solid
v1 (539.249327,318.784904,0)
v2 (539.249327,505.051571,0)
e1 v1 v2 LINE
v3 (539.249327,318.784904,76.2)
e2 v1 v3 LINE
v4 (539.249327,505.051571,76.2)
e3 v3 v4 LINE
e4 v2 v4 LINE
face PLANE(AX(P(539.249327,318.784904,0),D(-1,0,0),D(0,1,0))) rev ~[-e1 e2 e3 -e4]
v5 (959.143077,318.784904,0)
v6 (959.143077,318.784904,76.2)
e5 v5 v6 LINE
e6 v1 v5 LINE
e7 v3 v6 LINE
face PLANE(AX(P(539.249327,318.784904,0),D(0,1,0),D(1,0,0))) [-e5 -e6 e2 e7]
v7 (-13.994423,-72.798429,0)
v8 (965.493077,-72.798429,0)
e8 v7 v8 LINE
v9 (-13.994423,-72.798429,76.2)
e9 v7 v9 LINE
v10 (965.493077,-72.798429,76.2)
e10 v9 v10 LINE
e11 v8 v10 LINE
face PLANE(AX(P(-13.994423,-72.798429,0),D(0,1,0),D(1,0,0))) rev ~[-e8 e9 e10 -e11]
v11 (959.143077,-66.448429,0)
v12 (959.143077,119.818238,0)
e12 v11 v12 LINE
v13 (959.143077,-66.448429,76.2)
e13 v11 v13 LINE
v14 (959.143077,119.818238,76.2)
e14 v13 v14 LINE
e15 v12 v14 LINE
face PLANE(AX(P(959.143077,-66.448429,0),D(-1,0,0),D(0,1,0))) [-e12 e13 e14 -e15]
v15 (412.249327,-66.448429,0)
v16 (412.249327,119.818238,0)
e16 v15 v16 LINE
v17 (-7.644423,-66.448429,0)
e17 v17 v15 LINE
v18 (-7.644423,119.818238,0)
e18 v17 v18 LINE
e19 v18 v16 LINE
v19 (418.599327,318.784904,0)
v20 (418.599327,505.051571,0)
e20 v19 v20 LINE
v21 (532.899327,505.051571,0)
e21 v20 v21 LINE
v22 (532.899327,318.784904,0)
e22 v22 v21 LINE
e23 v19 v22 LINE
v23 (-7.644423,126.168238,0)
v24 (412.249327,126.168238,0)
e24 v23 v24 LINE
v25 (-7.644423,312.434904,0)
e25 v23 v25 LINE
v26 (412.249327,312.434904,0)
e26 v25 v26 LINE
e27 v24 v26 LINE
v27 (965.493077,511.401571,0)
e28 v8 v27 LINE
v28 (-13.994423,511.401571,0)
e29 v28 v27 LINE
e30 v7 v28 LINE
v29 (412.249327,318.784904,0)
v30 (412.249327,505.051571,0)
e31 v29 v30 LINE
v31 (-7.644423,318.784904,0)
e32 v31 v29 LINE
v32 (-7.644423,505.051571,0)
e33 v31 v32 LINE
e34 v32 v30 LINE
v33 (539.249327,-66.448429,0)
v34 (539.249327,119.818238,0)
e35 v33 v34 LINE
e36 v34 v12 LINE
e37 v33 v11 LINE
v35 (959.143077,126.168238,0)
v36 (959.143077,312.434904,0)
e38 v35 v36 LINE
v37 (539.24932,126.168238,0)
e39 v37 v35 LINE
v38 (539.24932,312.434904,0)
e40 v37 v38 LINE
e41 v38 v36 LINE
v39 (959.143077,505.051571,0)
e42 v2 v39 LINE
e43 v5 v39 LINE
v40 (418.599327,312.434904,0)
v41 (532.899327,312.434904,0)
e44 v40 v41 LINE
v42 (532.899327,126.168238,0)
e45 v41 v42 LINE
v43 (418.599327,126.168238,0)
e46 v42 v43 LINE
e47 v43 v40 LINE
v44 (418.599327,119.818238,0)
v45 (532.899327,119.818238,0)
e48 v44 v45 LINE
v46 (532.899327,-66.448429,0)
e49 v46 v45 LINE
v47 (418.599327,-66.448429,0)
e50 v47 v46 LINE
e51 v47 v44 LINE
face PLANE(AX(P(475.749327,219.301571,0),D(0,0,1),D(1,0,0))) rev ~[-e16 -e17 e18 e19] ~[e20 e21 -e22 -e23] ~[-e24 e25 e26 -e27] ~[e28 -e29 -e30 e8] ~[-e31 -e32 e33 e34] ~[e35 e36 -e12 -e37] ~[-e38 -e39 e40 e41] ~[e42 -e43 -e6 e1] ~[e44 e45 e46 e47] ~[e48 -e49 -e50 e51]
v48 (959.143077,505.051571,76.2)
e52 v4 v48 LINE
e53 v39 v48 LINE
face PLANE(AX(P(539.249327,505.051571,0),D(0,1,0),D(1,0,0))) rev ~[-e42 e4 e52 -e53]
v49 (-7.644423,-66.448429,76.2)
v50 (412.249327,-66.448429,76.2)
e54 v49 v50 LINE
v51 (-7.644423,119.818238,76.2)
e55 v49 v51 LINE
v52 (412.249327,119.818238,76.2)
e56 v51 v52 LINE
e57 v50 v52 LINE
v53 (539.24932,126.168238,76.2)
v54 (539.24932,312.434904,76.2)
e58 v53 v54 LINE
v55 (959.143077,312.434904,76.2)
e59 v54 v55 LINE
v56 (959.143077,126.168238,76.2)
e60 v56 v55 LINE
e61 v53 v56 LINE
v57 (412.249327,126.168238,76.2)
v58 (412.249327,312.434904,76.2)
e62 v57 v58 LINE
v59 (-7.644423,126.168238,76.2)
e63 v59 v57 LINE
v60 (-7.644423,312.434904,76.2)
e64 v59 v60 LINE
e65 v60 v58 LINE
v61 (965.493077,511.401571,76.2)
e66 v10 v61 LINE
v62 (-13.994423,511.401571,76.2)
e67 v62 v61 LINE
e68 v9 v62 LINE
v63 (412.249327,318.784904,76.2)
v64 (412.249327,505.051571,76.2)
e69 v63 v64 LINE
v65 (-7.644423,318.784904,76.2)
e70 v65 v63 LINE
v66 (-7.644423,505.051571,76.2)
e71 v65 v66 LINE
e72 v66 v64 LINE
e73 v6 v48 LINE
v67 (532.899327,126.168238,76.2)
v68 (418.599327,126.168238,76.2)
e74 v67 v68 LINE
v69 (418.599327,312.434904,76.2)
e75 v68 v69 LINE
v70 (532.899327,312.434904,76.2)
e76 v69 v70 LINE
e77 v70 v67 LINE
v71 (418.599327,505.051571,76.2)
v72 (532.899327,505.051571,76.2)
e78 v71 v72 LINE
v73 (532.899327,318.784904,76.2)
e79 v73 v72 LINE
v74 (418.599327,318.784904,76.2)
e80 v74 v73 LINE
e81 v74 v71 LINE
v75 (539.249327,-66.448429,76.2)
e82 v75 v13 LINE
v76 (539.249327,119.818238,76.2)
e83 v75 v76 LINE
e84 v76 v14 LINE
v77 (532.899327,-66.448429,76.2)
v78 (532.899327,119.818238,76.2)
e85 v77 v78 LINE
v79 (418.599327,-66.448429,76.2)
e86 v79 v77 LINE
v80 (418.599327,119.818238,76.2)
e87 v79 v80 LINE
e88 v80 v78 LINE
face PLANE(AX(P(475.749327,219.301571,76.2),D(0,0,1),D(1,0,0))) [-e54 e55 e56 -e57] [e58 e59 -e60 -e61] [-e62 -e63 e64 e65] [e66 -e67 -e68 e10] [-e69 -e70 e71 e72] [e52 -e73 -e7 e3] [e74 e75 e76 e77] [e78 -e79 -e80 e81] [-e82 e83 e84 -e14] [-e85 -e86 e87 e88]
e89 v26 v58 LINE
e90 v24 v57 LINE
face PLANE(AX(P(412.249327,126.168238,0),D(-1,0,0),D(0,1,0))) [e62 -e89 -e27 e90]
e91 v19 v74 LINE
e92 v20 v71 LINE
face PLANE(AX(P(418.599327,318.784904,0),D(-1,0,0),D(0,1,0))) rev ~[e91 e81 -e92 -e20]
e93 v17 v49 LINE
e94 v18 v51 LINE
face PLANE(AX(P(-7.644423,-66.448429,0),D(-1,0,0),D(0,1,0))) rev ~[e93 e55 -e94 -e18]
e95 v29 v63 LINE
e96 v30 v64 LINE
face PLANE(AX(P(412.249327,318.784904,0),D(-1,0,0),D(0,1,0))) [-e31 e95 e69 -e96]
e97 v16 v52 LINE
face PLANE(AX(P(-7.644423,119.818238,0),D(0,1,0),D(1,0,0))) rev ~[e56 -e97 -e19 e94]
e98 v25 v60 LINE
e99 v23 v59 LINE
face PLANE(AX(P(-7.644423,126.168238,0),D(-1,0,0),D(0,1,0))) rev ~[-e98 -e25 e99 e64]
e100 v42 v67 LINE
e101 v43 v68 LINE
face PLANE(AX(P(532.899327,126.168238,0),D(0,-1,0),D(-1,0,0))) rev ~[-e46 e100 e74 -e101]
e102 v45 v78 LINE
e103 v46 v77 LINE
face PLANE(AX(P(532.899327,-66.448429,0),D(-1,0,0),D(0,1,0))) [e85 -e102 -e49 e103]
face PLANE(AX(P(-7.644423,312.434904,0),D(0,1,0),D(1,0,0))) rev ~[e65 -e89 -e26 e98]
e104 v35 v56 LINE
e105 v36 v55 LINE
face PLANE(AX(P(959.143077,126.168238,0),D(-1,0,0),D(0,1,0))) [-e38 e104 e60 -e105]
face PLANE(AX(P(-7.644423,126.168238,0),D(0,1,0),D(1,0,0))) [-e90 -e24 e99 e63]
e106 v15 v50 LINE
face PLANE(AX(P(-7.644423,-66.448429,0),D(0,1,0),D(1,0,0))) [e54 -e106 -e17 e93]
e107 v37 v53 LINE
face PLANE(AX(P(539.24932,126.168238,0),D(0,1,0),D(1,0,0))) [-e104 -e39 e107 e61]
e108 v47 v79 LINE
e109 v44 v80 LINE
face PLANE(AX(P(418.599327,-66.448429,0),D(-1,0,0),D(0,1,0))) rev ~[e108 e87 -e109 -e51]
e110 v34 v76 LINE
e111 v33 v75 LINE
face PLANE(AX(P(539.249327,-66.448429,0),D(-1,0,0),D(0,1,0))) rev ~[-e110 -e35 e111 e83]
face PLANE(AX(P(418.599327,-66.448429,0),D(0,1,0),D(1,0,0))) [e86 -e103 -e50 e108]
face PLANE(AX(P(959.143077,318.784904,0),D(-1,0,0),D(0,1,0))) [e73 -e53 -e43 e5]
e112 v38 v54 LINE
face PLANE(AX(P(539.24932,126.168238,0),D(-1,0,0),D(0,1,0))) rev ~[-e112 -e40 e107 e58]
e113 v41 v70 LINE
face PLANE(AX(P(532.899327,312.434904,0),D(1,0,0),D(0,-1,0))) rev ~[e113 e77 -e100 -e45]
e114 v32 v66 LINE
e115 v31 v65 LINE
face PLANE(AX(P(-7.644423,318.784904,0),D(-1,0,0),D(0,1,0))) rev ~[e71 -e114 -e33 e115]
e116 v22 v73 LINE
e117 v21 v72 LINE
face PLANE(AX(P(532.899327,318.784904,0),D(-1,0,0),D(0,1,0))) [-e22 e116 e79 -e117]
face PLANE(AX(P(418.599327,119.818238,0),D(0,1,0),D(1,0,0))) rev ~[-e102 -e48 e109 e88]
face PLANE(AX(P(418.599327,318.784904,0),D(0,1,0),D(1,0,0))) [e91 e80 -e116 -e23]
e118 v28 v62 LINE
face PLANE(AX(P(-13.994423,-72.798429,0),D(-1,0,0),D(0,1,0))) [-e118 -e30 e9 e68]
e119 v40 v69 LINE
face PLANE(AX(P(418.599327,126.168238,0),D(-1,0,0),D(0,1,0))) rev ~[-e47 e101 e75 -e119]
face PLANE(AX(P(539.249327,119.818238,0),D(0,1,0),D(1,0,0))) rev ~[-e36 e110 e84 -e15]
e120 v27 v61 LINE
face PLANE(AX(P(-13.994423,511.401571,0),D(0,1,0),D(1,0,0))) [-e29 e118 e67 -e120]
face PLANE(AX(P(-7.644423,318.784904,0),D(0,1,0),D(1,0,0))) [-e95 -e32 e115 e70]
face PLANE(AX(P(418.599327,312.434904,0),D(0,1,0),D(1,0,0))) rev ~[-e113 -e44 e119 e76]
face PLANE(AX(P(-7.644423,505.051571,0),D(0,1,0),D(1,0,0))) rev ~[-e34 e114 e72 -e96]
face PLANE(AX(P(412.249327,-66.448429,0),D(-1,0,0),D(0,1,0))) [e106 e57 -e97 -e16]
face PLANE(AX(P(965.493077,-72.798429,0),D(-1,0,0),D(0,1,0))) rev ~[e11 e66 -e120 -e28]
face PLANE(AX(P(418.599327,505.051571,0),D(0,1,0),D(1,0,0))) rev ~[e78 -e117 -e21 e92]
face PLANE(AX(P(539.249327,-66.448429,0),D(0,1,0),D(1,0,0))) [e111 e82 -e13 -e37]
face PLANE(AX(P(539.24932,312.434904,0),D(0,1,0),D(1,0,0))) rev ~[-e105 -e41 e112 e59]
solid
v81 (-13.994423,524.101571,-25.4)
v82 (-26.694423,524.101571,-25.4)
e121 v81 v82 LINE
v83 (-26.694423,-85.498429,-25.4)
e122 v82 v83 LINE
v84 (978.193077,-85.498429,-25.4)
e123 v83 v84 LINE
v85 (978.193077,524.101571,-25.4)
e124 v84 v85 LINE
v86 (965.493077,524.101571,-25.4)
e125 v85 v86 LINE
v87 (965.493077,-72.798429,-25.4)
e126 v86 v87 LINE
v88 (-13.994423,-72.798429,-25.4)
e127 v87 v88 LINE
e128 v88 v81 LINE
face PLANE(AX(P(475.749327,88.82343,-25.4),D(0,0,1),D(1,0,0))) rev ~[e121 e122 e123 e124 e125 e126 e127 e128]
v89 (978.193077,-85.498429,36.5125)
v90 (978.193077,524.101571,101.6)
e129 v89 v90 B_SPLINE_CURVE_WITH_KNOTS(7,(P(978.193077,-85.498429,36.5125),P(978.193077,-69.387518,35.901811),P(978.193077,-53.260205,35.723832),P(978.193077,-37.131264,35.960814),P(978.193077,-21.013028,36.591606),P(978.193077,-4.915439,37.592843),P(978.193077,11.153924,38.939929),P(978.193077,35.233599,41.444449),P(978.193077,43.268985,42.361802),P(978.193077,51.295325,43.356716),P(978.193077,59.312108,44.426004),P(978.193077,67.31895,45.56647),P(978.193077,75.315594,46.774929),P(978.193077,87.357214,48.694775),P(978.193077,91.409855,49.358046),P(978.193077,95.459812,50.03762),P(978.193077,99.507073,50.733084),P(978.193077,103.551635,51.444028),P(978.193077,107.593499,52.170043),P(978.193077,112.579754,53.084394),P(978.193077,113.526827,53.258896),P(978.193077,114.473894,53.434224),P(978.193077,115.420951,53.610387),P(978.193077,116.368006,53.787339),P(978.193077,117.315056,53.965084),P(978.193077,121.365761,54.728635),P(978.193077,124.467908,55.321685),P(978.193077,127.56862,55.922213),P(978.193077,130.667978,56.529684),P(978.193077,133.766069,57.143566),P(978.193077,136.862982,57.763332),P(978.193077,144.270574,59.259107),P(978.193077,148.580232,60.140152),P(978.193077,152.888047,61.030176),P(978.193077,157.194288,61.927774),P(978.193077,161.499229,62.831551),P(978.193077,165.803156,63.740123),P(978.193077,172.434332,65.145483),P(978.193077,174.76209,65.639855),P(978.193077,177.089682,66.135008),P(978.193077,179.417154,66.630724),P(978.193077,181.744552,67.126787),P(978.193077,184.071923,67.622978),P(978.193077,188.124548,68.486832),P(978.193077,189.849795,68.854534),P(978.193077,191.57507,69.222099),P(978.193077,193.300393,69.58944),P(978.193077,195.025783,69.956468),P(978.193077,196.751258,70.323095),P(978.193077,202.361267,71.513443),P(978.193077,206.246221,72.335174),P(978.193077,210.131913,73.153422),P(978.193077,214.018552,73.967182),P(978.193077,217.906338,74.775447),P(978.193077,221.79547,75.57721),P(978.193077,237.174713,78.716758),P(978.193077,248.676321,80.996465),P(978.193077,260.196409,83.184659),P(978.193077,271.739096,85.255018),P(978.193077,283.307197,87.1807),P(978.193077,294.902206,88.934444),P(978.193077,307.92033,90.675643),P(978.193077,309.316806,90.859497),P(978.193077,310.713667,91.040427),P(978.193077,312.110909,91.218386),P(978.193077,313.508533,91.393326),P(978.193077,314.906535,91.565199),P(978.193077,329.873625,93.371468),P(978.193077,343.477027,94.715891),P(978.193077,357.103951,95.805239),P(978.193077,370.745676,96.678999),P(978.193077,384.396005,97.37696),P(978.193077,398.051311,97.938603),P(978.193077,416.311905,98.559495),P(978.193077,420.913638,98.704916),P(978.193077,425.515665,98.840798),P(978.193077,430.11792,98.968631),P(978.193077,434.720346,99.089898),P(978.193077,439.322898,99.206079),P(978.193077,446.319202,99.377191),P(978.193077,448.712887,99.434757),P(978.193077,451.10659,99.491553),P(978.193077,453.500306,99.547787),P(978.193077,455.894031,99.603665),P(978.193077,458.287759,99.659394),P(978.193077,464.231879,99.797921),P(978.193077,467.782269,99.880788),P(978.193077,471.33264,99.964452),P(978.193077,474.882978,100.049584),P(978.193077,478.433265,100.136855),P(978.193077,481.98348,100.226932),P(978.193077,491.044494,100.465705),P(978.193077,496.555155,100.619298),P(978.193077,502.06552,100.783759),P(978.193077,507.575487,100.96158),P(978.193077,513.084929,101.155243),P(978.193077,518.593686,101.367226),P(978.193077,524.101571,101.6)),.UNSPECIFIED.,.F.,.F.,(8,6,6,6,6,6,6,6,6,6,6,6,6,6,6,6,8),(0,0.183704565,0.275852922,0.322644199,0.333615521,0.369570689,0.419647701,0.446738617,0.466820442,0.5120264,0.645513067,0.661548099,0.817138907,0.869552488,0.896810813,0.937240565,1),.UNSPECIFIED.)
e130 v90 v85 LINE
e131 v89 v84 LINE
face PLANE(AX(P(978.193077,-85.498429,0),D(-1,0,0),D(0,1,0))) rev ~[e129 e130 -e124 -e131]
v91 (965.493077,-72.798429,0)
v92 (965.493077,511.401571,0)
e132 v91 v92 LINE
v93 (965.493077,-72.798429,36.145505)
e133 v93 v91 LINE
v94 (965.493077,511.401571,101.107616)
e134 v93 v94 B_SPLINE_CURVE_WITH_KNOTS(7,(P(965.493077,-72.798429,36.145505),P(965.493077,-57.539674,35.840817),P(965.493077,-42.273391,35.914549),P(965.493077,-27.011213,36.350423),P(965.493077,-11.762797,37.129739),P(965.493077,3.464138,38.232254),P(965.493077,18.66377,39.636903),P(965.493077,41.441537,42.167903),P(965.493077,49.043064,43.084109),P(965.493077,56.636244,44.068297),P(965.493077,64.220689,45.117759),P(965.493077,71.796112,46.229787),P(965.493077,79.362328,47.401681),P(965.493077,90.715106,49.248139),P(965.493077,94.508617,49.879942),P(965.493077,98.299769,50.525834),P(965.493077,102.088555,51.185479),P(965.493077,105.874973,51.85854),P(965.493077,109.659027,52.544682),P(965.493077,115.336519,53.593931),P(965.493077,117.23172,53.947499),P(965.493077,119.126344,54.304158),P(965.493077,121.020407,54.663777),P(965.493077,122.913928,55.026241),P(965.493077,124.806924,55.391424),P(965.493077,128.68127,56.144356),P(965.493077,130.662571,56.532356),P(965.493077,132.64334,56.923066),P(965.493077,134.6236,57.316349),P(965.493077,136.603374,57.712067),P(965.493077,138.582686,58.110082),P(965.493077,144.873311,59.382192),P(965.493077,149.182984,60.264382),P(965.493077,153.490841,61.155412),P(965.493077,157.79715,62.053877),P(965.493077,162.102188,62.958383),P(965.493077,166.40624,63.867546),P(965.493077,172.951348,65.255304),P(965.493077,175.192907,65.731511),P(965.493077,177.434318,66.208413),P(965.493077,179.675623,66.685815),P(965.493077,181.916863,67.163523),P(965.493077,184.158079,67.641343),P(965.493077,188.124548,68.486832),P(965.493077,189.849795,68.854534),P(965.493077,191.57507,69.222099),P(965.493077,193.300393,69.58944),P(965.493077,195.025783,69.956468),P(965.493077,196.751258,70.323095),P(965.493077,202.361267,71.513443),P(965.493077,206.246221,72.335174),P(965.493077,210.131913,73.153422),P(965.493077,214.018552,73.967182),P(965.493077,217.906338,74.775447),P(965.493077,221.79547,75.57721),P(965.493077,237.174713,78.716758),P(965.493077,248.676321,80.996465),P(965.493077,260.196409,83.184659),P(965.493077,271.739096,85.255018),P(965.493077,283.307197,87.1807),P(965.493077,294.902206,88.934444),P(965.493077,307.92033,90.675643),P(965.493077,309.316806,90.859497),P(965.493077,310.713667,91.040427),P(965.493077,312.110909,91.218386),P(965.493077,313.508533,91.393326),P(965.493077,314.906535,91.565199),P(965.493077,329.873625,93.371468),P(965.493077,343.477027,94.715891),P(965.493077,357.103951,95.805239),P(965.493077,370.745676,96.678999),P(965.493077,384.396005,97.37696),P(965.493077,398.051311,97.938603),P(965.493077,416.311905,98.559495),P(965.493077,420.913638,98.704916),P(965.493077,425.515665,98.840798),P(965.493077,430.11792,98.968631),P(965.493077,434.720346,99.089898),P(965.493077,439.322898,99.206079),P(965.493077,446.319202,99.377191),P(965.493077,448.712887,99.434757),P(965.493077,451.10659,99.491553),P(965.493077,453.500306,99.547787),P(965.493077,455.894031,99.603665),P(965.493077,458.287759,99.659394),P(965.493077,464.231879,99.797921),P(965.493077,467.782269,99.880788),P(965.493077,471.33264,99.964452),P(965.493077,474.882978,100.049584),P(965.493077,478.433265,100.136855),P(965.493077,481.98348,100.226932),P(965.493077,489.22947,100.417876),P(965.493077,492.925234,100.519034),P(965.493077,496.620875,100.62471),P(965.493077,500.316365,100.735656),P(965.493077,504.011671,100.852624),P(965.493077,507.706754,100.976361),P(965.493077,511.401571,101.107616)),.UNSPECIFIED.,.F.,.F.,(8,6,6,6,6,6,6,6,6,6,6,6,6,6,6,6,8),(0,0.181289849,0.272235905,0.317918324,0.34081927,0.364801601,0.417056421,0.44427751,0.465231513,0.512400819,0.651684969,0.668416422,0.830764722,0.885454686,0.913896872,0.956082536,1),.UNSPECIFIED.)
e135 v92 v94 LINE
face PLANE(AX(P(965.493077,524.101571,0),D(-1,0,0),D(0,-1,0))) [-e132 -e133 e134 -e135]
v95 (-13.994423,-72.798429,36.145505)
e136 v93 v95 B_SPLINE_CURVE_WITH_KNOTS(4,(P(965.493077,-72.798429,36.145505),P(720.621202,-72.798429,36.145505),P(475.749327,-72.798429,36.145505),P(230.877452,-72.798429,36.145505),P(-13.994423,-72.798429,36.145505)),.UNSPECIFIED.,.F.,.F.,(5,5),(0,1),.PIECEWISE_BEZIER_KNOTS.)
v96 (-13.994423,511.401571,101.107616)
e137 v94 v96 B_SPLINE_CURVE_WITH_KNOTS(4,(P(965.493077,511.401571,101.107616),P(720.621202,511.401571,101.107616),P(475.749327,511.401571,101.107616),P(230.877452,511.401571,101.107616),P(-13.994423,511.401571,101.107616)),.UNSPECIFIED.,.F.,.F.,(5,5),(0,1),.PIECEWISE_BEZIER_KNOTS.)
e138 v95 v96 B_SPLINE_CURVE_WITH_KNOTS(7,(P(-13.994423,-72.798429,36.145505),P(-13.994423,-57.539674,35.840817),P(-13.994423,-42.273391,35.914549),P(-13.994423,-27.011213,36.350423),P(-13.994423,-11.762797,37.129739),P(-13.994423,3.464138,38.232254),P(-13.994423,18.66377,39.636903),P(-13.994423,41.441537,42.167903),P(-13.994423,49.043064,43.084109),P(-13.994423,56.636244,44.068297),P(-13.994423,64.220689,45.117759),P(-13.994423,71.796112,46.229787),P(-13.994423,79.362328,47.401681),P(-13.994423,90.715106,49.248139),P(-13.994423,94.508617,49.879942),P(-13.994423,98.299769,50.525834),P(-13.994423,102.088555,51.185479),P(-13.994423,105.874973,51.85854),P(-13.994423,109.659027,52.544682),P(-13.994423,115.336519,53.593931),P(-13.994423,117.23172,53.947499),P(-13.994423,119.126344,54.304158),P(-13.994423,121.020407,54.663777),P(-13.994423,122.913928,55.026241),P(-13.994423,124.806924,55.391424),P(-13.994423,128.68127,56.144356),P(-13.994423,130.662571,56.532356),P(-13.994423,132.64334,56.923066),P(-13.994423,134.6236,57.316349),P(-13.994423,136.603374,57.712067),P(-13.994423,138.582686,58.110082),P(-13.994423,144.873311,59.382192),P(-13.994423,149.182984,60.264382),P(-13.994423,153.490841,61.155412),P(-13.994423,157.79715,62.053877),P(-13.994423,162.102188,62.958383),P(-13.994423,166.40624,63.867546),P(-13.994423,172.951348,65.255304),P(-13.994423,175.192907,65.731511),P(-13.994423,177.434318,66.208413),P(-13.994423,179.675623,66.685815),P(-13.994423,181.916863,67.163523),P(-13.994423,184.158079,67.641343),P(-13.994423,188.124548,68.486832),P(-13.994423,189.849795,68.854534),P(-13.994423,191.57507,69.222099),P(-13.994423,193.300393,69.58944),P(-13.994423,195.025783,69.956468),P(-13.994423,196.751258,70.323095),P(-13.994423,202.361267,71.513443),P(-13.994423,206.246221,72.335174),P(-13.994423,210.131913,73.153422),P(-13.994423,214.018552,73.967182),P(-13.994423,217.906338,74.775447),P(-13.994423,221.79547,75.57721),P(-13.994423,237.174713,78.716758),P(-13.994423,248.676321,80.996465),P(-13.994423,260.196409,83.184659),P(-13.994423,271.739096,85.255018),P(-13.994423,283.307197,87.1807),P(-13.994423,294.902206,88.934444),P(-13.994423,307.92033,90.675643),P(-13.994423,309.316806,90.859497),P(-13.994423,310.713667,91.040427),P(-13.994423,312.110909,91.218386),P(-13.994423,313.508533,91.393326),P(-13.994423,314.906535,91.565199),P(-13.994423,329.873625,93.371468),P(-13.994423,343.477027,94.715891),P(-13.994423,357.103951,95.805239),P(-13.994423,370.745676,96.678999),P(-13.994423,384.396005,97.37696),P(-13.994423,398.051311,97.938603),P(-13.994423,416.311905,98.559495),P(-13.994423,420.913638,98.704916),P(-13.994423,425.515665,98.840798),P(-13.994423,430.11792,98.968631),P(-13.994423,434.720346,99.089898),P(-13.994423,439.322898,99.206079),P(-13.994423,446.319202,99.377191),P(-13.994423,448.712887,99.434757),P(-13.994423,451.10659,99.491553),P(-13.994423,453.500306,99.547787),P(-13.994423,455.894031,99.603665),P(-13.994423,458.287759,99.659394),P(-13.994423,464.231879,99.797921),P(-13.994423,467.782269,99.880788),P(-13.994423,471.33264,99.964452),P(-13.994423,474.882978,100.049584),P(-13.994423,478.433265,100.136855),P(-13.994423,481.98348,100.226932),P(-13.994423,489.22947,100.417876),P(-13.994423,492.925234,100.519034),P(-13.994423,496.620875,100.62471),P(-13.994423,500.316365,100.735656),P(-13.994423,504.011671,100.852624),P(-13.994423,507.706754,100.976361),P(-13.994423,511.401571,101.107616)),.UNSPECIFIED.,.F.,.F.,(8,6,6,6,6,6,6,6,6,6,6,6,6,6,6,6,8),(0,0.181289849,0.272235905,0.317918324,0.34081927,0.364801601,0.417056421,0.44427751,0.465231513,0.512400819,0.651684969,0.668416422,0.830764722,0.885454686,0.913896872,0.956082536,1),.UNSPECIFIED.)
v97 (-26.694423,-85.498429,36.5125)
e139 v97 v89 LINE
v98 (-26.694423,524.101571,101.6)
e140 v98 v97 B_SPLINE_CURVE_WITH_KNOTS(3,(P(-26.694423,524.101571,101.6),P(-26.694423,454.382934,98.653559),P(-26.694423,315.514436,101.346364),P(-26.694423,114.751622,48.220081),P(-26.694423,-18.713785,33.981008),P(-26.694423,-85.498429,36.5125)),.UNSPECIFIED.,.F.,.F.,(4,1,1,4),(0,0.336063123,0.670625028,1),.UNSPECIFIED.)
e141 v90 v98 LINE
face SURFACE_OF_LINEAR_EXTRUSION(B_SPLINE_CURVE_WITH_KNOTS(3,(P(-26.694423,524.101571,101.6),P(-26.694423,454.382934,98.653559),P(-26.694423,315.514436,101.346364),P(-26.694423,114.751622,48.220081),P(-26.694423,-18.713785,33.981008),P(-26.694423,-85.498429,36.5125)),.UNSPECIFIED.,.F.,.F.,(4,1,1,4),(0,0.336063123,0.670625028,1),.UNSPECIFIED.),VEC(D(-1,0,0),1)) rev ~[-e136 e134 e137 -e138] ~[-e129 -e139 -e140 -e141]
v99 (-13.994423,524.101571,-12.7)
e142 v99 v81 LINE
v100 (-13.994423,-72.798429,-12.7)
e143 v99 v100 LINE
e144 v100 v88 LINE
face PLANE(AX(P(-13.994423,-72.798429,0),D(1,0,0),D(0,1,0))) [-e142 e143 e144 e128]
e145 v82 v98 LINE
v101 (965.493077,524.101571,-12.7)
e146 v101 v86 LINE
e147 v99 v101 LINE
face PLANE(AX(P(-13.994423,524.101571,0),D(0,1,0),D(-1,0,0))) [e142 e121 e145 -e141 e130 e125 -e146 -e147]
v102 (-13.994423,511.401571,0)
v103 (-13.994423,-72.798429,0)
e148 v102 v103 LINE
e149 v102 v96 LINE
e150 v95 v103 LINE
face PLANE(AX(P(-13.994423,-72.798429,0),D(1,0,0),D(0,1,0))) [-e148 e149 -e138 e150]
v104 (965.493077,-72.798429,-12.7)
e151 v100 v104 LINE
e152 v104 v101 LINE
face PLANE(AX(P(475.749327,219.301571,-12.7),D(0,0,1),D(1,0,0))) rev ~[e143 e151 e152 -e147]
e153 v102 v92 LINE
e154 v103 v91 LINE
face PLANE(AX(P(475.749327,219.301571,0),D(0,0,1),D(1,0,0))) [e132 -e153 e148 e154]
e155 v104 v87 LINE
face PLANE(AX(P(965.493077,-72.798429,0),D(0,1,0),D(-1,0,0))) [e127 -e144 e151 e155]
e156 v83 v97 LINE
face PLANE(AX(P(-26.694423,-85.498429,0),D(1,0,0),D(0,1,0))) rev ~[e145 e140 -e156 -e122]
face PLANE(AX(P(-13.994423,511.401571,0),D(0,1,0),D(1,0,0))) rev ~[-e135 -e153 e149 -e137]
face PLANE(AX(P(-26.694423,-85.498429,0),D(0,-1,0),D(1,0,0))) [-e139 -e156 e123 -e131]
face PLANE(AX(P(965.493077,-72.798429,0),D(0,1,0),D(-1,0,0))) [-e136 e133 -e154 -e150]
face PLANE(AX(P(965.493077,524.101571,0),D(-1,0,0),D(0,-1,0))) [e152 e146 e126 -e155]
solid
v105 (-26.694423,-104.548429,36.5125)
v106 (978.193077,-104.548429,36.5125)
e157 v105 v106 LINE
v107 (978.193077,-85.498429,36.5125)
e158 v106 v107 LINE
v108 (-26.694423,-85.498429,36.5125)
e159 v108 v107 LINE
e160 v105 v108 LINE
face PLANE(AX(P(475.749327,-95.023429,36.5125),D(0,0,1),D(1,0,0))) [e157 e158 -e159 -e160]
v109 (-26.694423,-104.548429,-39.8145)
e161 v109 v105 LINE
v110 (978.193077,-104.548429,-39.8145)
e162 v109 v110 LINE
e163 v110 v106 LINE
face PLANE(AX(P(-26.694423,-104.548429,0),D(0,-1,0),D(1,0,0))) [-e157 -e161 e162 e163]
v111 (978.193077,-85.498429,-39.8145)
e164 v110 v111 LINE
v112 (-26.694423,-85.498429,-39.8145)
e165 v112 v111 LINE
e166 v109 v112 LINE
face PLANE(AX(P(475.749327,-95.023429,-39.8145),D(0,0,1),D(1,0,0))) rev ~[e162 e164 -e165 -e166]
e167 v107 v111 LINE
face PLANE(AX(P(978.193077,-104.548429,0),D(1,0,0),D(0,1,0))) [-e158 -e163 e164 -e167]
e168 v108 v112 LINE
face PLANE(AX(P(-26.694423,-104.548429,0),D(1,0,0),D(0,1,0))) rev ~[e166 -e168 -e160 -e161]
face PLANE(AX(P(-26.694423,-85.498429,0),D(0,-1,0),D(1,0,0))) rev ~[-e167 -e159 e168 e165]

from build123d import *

# Parameters (mm, degrees)
F0_W     = 979.4875
F0_H     = 12.7
F1_DEPTH = 101.6
F2_DEPTH = 25.4
F3_W     = 1004.8875
F3_H     = 609.6
F3_W_2   = 419.89375
F3_H_2   = 186.2666666667
F4_DEPTH = 12.7
F6_DEPTH = 1004.8885
F0_W_2   = 1004.8875
F0_H_2   = 19.05
F7_DEPTH = 36.5125
F8_DEPTH = 39.8145
F0_H_3   = 584.2
F0_W_3   = 419.89375
F0_H_4   = 186.2666666667
F0_W_4   = 114.3
F0_W_5   = 419.8937565804
F9_DEPTH = 76.2


with BuildPart() as f1:
    # F0 (on Top) → F1 (new body)
    with BuildSketch(Plane.XY):
        Polygon((-13.9944232941, 524.1015708923), (-26.6944232941, 524.1015708923), (-26.6944232941, -85.4984291077), (978.1930767059, -85.4984291077), (978.1930767059, 524.1015708923), (965.4930767059, 524.1015708923), (965.4930767059, 511.4015708923), (965.4930767059, -72.7984291077), (-13.9944232941, -72.7984291077), (-13.9944232941, 511.4015708923), align=None)
        with Locations((475.7493267059, 517.7515708923)):
            Rectangle(F0_W, F0_H)
    extrude(amount=F1_DEPTH)

    # F0 (on Top) → F2 (join)
    with BuildSketch(Plane.XY):
        Polygon((-13.9944232941, 524.1015708923), (-26.6944232941, 524.1015708923), (-26.6944232941, -85.4984291077), (978.1930767059, -85.4984291077), (978.1930767059, 524.1015708923), (965.4930767059, 524.1015708923), (965.4930767059, 511.4015708923), (965.4930767059, -72.7984291077), (-13.9944232941, -72.7984291077), (-13.9944232941, 511.4015708923), align=None)
    extrude(amount=-F2_DEPTH)

    # F3 (on face) → F4 (join)
    with BuildSketch(Plane.XY):
        with Locations((475.7493267059, 219.3015708923)):
            Rectangle(F3_W, F3_H)
        with Locations((749.1962017059, 411.918237559)):
            Rectangle(F3_W_2, F3_H_2, mode=Mode.SUBTRACT)
        with Locations((749.1962017059, 411.918237559)):
            Rectangle(F3_W_2, F3_H_2)
    extrude(amount=-F4_DEPTH)

    # F5 (on face) → F6 (cut, through all)
    with BuildSketch(Plane(origin=(-26.6944232941, 0, 0), x_dir=(0, -1, 0), z_dir=(-1, 0, 0))):
        with BuildLine():
            Line((85.4984291077, 101.6), (-524.1015708923, 101.6))
            add(Edge.make_bspline(
                [(-524.1015708923, 101.6), (-454.3829336776, 98.6535593443), (-315.5144360565, 101.3463644472), (-114.7516219339, 48.2200810371), (18.7137848875, 33.9810080981), (85.4984291077, 36.5125)],
                knots=[0, 0, 0, 0, 0.3360631231, 0.6706250277, 1, 1, 1, 1], degree=3))
            Line((85.4984291077, 36.5125), (85.4984291077, 101.6))
        make_face()
    extrude(amount=-F6_DEPTH, mode=Mode.SUBTRACT)


with BuildPart() as f7:
    # F0 (on Top) → F7 (new body)
    with BuildSketch(Plane.XY):
        with Locations((475.7493267059, -95.0234291077)):
            Rectangle(F0_W_2, F0_H_2)
    extrude(amount=F7_DEPTH)

    # F0 (on Top) → F8 (join)
    with BuildSketch(Plane.XY):
        with Locations((475.7493267059, -95.0234291077)):
            Rectangle(F0_W_2, F0_H_2)
    extrude(amount=-F8_DEPTH)


with BuildPart() as f9:
    # F0 (on Top) → F9 (new body)
    with BuildSketch(Plane.XY):
        with Locations((475.7493267059, 219.3015708923)):
            Rectangle(F0_W, F0_H_3)
        with Locations((202.3024517059, 26.6849042257)):
            Rectangle(F0_W_3, F0_H_4, mode=Mode.SUBTRACT)
        with Locations((475.7493267059, 26.6849042257)):
            Rectangle(F0_W_4, F0_H_4, mode=Mode.SUBTRACT)
        with Locations((749.1962017059, 26.6849042257)):
            Rectangle(F0_W_3, F0_H_4, mode=Mode.SUBTRACT)
        with Locations((202.3024517059, 219.3015708923)):
            Rectangle(F0_W_3, F0_H_4, mode=Mode.SUBTRACT)
        with Locations((202.3024517059, 411.918237559)):
            Rectangle(F0_W_3, F0_H_4, mode=Mode.SUBTRACT)
        Polygon((418.5993267059, 312.4349042257), (532.8993267059, 312.4349042257), (532.8993267059, 293.2371660391), (532.8993267059, 126.168237559), (418.5993267059, 126.168237559), align=None, mode=Mode.SUBTRACT)
        with Locations((749.1961984158, 219.3015708923)):
            Rectangle(F0_W_5, F0_H_4, mode=Mode.SUBTRACT)
        with Locations((475.7493267059, 411.918237559)):
            Rectangle(F0_W_4, F0_H_4, mode=Mode.SUBTRACT)
        with Locations((749.1962017059, 411.918237559)):
            Rectangle(F0_W_3, F0_H_4, mode=Mode.SUBTRACT)
    extrude(amount=F9_DEPTH)


solid = Compound([f1.part, f7.part, f9.part])
